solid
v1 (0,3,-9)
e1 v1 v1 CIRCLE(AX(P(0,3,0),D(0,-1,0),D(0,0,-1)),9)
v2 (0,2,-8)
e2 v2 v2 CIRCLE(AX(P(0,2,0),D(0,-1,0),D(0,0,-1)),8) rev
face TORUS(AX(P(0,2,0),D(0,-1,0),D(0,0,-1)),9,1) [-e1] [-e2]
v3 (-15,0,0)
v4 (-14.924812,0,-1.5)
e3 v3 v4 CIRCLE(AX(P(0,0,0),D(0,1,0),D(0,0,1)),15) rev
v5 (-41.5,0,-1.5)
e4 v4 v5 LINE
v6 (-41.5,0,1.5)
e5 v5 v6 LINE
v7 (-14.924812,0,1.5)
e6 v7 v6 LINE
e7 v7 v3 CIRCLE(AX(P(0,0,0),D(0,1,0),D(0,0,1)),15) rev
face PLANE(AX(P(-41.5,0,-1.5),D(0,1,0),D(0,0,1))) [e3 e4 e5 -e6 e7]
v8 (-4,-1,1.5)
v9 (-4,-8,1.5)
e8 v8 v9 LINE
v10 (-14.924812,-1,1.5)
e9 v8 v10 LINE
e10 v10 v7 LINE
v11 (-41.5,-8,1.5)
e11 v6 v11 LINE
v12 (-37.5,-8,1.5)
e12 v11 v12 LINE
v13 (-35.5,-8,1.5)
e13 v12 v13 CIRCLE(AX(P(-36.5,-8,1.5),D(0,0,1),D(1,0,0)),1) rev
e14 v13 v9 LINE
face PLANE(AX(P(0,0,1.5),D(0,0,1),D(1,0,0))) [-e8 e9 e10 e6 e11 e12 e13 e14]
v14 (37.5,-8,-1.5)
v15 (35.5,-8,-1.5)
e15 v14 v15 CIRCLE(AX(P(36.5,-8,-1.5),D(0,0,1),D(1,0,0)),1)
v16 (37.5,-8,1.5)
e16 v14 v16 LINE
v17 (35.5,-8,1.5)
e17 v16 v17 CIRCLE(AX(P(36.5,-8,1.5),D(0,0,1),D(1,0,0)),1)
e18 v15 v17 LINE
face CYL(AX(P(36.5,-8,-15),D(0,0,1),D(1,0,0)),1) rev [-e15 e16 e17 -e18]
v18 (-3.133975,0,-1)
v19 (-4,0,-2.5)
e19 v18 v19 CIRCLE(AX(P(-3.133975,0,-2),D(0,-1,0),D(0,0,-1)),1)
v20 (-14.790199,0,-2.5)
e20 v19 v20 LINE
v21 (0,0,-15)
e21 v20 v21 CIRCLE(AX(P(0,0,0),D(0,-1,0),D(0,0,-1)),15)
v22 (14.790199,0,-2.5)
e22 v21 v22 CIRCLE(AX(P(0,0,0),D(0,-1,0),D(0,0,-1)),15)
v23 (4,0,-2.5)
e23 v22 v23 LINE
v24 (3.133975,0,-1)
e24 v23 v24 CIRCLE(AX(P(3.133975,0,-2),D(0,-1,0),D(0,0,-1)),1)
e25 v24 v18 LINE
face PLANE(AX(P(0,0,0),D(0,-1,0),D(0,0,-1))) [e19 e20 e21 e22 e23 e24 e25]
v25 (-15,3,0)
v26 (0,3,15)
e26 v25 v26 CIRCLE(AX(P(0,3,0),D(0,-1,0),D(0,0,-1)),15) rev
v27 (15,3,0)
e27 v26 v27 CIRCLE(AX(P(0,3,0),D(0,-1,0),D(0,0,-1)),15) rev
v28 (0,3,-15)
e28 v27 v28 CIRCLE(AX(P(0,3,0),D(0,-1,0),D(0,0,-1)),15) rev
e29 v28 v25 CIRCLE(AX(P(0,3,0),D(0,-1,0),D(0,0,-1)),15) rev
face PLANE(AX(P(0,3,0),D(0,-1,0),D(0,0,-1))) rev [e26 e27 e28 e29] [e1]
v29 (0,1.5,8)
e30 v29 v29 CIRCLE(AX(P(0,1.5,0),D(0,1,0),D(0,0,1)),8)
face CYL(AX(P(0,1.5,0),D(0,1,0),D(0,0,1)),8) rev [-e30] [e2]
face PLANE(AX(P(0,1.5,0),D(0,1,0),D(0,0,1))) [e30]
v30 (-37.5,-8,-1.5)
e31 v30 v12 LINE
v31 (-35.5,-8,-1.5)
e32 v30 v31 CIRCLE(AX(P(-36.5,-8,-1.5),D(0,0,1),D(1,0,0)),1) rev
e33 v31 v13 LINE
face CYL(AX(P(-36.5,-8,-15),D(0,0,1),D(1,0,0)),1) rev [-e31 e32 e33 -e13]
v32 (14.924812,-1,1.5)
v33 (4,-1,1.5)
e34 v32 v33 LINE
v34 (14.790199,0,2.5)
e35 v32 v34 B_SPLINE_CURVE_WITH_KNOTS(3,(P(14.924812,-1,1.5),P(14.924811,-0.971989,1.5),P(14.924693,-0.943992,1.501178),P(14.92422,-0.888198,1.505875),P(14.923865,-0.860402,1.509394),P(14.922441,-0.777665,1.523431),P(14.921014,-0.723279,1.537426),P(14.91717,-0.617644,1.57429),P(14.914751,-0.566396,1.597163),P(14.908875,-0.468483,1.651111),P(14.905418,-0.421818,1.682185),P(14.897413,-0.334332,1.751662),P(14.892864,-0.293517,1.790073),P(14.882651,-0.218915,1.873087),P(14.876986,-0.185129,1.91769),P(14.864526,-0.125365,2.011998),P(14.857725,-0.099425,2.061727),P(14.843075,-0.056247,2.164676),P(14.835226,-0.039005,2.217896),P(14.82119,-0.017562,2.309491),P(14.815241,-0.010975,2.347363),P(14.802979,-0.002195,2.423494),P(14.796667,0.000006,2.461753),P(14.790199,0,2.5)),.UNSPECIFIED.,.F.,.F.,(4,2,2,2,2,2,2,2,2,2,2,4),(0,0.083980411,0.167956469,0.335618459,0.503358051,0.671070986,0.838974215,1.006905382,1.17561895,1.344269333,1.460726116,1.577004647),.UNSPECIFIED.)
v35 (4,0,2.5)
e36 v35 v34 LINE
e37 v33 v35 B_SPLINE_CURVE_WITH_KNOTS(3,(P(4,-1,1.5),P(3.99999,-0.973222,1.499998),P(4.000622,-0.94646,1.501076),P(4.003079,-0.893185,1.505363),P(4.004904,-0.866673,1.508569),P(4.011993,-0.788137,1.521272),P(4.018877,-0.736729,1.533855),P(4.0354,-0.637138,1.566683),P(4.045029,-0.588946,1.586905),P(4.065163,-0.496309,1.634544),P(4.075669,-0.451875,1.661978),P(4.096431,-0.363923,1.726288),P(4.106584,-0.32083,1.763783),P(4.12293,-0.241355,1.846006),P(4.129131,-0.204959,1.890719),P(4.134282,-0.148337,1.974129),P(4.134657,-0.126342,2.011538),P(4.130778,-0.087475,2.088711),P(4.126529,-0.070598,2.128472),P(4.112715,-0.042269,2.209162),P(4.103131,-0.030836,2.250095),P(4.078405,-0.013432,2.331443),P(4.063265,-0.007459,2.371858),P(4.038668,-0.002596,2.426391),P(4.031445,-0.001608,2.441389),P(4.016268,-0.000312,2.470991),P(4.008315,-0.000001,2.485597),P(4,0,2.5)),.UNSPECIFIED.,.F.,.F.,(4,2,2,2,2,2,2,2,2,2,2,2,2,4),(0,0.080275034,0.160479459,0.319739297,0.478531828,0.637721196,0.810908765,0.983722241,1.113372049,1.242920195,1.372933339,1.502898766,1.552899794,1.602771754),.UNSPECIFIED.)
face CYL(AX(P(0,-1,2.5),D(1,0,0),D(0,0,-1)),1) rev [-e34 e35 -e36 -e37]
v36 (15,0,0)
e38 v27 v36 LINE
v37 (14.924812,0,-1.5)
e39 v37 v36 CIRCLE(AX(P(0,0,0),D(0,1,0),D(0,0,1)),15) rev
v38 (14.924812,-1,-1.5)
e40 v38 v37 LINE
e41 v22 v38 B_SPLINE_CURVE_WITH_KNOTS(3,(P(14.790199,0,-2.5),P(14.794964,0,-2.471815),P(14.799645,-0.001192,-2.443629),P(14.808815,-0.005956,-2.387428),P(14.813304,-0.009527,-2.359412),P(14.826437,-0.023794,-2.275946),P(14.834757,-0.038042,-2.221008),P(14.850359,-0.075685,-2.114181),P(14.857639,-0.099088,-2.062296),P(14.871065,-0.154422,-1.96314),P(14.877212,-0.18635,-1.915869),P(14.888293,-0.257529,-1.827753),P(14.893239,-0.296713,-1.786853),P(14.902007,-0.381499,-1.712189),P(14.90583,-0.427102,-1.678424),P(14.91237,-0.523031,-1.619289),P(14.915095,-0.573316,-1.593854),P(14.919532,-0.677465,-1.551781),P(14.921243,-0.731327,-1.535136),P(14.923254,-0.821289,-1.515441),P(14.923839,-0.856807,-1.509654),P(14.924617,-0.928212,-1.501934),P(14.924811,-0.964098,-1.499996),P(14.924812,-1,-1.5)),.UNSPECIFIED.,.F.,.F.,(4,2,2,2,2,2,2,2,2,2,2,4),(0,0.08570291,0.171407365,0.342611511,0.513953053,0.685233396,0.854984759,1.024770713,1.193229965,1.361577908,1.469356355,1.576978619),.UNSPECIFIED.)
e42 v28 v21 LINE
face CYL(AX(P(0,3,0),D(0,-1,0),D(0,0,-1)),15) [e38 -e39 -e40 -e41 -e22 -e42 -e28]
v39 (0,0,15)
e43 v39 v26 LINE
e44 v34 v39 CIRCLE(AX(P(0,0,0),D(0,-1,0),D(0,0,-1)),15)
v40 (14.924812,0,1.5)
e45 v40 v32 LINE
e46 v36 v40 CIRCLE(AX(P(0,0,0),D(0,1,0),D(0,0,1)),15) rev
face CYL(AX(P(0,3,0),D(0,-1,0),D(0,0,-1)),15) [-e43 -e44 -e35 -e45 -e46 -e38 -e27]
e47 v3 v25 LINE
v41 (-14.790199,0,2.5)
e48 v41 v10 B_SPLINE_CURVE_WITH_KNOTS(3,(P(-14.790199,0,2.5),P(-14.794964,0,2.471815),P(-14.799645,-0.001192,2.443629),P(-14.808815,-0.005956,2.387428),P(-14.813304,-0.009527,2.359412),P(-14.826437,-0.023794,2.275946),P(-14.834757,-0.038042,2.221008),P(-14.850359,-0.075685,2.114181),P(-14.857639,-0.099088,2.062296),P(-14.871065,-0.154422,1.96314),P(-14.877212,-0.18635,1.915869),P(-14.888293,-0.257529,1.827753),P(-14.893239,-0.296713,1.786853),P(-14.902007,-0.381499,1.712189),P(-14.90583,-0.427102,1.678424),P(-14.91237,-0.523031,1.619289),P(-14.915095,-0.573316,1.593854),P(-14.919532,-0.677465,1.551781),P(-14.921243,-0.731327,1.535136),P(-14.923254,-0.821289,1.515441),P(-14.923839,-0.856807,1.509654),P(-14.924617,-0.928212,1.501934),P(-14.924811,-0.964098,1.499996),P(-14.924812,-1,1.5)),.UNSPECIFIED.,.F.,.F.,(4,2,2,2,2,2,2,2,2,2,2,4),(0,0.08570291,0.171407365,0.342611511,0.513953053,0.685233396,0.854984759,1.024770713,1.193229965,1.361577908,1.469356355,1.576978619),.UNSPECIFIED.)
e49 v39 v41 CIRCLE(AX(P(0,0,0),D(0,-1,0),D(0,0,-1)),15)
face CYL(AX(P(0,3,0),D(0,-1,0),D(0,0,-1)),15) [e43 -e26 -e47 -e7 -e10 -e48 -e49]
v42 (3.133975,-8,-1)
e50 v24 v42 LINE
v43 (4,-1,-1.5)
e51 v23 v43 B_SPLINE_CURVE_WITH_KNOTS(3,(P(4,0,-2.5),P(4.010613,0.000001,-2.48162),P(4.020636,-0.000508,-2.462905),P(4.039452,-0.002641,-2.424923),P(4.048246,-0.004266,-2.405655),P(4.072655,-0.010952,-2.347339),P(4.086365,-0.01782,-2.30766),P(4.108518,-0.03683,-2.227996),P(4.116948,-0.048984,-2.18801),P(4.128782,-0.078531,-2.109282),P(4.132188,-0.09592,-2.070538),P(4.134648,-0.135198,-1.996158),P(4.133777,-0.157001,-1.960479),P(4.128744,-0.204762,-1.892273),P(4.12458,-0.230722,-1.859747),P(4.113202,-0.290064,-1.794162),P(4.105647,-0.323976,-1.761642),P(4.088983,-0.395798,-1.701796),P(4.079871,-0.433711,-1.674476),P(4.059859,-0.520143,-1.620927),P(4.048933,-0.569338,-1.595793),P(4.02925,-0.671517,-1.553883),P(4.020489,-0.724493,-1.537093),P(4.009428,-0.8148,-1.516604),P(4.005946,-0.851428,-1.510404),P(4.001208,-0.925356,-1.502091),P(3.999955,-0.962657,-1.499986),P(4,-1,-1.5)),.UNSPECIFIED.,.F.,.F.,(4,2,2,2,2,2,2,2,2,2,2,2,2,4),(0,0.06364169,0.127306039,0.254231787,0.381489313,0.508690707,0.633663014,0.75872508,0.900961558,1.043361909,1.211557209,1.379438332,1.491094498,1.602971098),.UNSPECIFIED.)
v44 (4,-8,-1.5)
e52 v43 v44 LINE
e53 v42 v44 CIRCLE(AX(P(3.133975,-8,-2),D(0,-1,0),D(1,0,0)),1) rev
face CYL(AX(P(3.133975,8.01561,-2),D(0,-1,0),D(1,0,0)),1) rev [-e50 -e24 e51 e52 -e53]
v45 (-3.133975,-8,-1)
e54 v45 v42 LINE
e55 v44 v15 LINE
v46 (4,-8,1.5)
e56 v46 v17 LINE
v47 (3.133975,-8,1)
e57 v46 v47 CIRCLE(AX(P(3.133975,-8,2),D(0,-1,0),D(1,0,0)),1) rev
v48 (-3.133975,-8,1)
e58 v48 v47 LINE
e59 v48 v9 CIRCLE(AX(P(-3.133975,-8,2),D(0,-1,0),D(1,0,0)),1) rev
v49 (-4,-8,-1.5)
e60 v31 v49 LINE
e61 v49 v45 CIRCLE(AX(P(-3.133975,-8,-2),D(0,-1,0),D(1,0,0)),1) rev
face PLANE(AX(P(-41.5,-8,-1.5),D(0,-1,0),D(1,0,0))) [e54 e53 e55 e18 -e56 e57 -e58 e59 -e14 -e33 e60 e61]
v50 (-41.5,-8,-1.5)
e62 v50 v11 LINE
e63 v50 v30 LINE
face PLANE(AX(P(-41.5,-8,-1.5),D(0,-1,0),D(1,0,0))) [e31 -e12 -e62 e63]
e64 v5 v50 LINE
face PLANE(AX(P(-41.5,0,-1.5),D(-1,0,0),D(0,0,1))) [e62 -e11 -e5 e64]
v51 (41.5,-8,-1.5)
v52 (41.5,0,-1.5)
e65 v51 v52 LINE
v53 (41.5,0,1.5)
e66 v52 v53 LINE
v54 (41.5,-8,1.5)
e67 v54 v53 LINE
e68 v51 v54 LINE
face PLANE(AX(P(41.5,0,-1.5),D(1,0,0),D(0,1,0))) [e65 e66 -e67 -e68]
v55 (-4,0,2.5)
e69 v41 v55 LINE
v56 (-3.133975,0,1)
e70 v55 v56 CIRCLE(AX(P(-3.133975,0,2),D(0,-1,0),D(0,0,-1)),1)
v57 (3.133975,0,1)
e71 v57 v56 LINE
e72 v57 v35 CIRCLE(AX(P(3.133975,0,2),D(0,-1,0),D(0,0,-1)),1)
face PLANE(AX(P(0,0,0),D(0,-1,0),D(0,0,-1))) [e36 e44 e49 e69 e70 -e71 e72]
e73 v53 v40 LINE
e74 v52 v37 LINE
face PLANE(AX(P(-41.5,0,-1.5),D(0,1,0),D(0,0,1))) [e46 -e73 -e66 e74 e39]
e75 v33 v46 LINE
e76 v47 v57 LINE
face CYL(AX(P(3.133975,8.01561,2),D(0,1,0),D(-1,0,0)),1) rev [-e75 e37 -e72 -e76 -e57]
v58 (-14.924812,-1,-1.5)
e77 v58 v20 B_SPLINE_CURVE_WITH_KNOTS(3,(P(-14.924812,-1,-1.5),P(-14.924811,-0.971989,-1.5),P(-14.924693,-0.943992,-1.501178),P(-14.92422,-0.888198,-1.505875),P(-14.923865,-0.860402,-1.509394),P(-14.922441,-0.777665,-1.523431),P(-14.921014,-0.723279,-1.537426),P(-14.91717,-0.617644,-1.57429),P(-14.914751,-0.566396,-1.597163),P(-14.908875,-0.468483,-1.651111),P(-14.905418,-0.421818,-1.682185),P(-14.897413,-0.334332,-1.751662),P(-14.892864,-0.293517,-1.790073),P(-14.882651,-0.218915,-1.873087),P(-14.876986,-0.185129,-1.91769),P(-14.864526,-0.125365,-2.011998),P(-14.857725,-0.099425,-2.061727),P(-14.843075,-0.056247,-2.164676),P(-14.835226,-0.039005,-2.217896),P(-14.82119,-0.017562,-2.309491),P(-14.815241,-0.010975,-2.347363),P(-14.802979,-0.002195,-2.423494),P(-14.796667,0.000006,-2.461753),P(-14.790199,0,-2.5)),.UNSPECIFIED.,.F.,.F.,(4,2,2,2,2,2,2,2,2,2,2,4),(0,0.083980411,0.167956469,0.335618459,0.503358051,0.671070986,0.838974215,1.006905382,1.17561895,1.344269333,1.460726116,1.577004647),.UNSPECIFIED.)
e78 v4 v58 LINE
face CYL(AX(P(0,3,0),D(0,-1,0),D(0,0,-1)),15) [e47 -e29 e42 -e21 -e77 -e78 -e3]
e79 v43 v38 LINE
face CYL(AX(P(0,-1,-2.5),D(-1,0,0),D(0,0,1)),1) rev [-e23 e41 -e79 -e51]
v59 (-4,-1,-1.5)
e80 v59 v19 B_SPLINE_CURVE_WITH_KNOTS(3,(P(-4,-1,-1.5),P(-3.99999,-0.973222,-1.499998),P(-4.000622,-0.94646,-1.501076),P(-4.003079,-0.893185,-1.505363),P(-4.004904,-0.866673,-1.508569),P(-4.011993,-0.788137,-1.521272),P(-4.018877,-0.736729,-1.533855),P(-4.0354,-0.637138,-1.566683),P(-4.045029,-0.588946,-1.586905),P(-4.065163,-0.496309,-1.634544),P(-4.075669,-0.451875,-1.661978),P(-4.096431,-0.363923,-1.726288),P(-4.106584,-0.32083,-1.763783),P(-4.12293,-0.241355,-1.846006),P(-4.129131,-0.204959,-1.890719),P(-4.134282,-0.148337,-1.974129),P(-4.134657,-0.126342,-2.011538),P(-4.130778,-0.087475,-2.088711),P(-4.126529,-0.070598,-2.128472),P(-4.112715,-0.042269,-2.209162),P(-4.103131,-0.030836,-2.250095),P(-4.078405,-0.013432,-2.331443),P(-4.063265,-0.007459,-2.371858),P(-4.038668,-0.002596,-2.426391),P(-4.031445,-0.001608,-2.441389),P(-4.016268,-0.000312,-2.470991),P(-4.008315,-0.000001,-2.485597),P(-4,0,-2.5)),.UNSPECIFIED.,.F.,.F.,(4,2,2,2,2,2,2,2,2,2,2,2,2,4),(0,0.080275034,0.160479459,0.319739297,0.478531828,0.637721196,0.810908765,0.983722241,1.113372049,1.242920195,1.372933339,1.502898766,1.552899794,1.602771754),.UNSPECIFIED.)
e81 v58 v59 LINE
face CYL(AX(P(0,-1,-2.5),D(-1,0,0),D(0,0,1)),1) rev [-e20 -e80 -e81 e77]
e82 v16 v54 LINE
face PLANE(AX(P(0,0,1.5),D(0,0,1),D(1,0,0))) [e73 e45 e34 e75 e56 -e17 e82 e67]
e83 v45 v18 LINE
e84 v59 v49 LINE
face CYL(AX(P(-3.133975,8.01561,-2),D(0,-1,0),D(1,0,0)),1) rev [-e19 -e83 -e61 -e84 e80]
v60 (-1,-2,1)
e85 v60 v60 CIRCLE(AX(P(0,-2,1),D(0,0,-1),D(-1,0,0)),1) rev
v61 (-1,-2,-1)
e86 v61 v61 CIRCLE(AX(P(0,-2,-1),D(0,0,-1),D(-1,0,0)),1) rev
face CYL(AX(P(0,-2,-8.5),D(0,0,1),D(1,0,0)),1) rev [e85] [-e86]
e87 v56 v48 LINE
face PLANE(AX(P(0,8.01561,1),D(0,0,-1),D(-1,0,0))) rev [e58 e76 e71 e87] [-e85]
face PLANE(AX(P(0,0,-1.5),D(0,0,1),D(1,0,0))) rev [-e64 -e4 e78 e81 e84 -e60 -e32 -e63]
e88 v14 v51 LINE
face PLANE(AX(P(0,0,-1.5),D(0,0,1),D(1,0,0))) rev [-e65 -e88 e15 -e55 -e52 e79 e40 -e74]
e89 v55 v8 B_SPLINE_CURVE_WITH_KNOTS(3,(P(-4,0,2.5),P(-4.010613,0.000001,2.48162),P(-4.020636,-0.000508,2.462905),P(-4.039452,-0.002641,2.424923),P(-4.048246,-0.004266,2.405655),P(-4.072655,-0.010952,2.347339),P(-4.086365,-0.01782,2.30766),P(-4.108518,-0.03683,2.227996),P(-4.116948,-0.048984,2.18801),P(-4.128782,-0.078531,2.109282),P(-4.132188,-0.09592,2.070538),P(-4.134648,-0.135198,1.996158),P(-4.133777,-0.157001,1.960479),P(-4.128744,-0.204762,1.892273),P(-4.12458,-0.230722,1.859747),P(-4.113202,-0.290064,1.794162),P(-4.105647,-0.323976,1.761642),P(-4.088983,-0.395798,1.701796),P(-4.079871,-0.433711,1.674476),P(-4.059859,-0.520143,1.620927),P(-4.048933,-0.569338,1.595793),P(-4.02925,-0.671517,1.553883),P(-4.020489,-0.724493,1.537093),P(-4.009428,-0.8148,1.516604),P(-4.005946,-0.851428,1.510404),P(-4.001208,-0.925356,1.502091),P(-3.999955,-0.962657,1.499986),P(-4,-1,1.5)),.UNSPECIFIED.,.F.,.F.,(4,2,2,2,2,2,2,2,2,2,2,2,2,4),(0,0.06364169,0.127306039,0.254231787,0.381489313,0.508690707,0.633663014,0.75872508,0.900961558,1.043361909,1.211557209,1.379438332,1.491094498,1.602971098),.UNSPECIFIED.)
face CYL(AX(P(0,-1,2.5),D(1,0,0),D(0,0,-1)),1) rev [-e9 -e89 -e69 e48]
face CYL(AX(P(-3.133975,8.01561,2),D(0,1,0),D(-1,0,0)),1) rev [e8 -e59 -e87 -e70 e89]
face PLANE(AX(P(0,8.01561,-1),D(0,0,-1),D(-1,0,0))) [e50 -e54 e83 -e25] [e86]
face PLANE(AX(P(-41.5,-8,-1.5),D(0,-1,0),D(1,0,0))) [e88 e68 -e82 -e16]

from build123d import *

# Parameters (mm, degrees)
SKETCH1_W                = 30
SKETCH1_H                = 30
BOSS_EXTRUDE1_DEPTH      = 3
BOSS_EXTRUDE2_DEPTH      = 1.5
BOSS_EXTRUDE2_DEPTH_BACK = 1.5
SKETCH2_W                = 83
SKETCH2_H                = 8
CUT_EXTRUDE1_DEPTH       = 46.370695388
SKETCH5_R                = 8
CUT_EXTRUDE2_DEPTH       = 1.5
FILLET1_R                = 1
SKETCH6_R                = 1
CUT_EXTRUDE3_DEPTH       = 10
CUT_EXTRUDE4_REACH       = 47.478
SKETCH9_W                = 8
SKETCH9_H                = 0.5
FILLET2_R                = 1
FILLET3_R                = 1
FILLET4_R                = 15


# Some blends are built 0.0001 mm under size
with BuildPart() as part:
    # Sketch1 → Boss-Extrude1 (new body)
    with BuildSketch(Plane(origin=(0, 0, 0), x_dir=(1, 0, 0), z_dir=(0, 1, 0))):
        Rectangle(SKETCH1_W, SKETCH1_H)
    extrude(amount=BOSS_EXTRUDE1_DEPTH)

    # Sketch2 → Boss-Extrude2 (add, two sides: drawn at the far end of the back side and taken through both)
    with BuildSketch(Plane.XY.offset(-BOSS_EXTRUDE2_DEPTH_BACK)):
        with Locations((0, -4)):
            Rectangle(SKETCH2_W, SKETCH2_H)
    extrude(amount=BOSS_EXTRUDE2_DEPTH + BOSS_EXTRUDE2_DEPTH_BACK)

    # Sketch4 → Cut-Extrude1 (cut, through all)
    with BuildSketch(Plane.XY.offset(1.5)):
        with BuildLine():
            ThreePointArc((-35.5, -8), (-36.5, -7), (-37.5, -8))
            Line((-37.5, -8), (-35.5, -8))
        make_face()
        with BuildLine():
            ThreePointArc((37.5, -8), (36.5, -7), (35.5, -8))
            Line((35.5, -8), (37.5, -8))
        make_face()
    extrude(amount=-CUT_EXTRUDE1_DEPTH, mode=Mode.SUBTRACT)

    # Sketch5 → Cut-Extrude2 (cut)
    with BuildSketch(Plane(origin=(0, 3, 0), x_dir=(1, 0, 0), z_dir=(0, 1, 0))):
        with Locations(Location((0, 0, 0), (0, 0, 270))):
            Circle(SKETCH5_R)
    extrude(amount=-CUT_EXTRUDE2_DEPTH, mode=Mode.SUBTRACT)

    # Fillet1
    fillet1_edges = [part.edges().sort_by_distance(p)[0] for p in [
        (0, 3, -8),
    ]]
    fillet(fillet1_edges, radius=FILLET1_R)

    # Sketch6 → Cut-Extrude3 (cut)
    with BuildSketch(Plane.XY.offset(1.5)):
        with Locations((0, -2)):
            Circle(SKETCH6_R)
    extrude(amount=-CUT_EXTRUDE3_DEPTH, mode=Mode.SUBTRACT)

    # Cut-Extrude4: up to this face of the body (flat: up to its plane)
    cut_extrude4_end = Plane(part.part.faces().sort_by_distance((0, 0, 8.25))[0])
    # Sketch9 → Cut-Extrude4 (cut, up to the picked face)
    with BuildSketch(Plane.XZ.offset(8), mode=Mode.PRIVATE) as cut_extrude4_sk1:
        with Locations((0, -1.25)):
            Rectangle(SKETCH9_W, SKETCH9_H)
    cut_extrude4_tool1 = split(extrude(cut_extrude4_sk1.sketch, amount=-CUT_EXTRUDE4_REACH, mode=Mode.PRIVATE), bisect_by=cut_extrude4_end, keep=Keep.BOTH, mode=Mode.PRIVATE)
    # Sketch9 → Cut-Extrude4 (cut, up to the picked face)
    with BuildSketch(Plane.XZ.offset(8), mode=Mode.PRIVATE) as cut_extrude4_sk2:
        with Locations((0, 1.25)):
            Rectangle(SKETCH9_W, SKETCH9_H)
    cut_extrude4_tool2 = split(extrude(cut_extrude4_sk2.sketch, amount=-CUT_EXTRUDE4_REACH, mode=Mode.PRIVATE), bisect_by=cut_extrude4_end, keep=Keep.BOTH, mode=Mode.PRIVATE)
    add(cut_extrude4_tool1.solids().sort_by(Axis((0, -8, -1.25), (0, 1, 0)))[0], mode=Mode.SUBTRACT)
    add(cut_extrude4_tool2.solids().sort_by(Axis((0, -8, 1.25), (0, 1, 0)))[0], mode=Mode.SUBTRACT)

    # Fillet2
    # the kernel refuses this fillet: 1 mm, written as the material it adds along each edge
    with BuildSketch(Plane(origin=(-4, -8, -1), x_dir=(0, 0, -1), z_dir=(0, 1, 0))) as fillet2_piece_1_section:
        with BuildLine():
            CenterArc((1, -0.866025404), FILLET2_R, 120, 60)
            Line((0, -0.866025404), (0, 0))
            Line((0, 0), (0.5, 0))
        make_face()
    fillet2_piece_1 = extrude(amount=10.165063509, mode=Mode.PRIVATE)
    fillet2_piece_1 = split(fillet2_piece_1, bisect_by=Plane(origin=(-3.634974596, 1.5, -1.132242545), z_dir=(0, -1, 0)), keep=Keep.TOP, mode=Mode.PRIVATE)
    add(fillet2_piece_1)
    with BuildSketch(Plane(origin=(4, -8, -1), x_dir=(0, 0, -1), z_dir=(0, 1, 0))) as fillet2_piece_2_section:
        with BuildLine():
            CenterArc((1, 0.866025404), FILLET2_R, 180, 60)
            Line((0, 0.866025404), (0, 0))
            Line((0, 0), (0.5, 0))
        make_face()
    fillet2_piece_2 = extrude(amount=10.165063509, mode=Mode.PRIVATE)
    fillet2_piece_2 = split(fillet2_piece_2, bisect_by=Plane(origin=(3.634974596, 1.5, -1.132242545), z_dir=(0, -1, 0)), keep=Keep.TOP, mode=Mode.PRIVATE)
    add(fillet2_piece_2)
    with BuildSketch(Plane(origin=(-4, -8, 1), x_dir=(0, 0, 1), z_dir=(0, 1, 0))) as fillet2_piece_3_section:
        with BuildLine():
            CenterArc((1, 0.866025404), FILLET2_R, 180, 60)
            Line((0, 0.866025404), (0, 0))
            Line((0, 0), (0.5, 0))
        make_face()
    fillet2_piece_3 = extrude(amount=10.165063509, mode=Mode.PRIVATE)
    fillet2_piece_3 = split(fillet2_piece_3, bisect_by=Plane(origin=(-3.634974596, 1.5, 1.132242545), z_dir=(0, -1, 0)), keep=Keep.TOP, mode=Mode.PRIVATE)
    add(fillet2_piece_3)
    with BuildSketch(Plane(origin=(4, -8, 1), x_dir=(0, 0, 1), z_dir=(0, 1, 0))) as fillet2_piece_4_section:
        with BuildLine():
            CenterArc((1, -0.866025404), FILLET2_R, 120, 60)
            Line((0, -0.866025404), (0, 0))
            Line((0, 0), (0.5, 0))
        make_face()
    fillet2_piece_4 = extrude(amount=10.165063509, mode=Mode.PRIVATE)
    fillet2_piece_4 = split(fillet2_piece_4, bisect_by=Plane(origin=(3.634974596, 1.5, 1.132242545), z_dir=(0, -1, 0)), keep=Keep.TOP, mode=Mode.PRIVATE)
    add(fillet2_piece_4)

    # Fillet3
    fillet3_edges = [part.edges().sort_by_distance(p)[0] for p in [
        (9.5, 0, -1.5),
        (9.5, 0, 1.5),
        (-9.5, 0, 1.5),
        (-9.5, 0, -1.5),
    ]]
    fillet(fillet3_edges, radius=FILLET3_R)

    # Fillet4
    fillet4_edges = [part.edges().sort_by_distance(p)[0] for p in [
        (-15, 1.5, -15),
        (15, 1.5, -15),
        (15, 1.5, 15),
        (-15, 1.5, 15),
    ]]
    fillet(fillet4_edges, radius=FILLET4_R - 0.0001)  # a hair under: the kernel refuses the full size


solid = part.part
